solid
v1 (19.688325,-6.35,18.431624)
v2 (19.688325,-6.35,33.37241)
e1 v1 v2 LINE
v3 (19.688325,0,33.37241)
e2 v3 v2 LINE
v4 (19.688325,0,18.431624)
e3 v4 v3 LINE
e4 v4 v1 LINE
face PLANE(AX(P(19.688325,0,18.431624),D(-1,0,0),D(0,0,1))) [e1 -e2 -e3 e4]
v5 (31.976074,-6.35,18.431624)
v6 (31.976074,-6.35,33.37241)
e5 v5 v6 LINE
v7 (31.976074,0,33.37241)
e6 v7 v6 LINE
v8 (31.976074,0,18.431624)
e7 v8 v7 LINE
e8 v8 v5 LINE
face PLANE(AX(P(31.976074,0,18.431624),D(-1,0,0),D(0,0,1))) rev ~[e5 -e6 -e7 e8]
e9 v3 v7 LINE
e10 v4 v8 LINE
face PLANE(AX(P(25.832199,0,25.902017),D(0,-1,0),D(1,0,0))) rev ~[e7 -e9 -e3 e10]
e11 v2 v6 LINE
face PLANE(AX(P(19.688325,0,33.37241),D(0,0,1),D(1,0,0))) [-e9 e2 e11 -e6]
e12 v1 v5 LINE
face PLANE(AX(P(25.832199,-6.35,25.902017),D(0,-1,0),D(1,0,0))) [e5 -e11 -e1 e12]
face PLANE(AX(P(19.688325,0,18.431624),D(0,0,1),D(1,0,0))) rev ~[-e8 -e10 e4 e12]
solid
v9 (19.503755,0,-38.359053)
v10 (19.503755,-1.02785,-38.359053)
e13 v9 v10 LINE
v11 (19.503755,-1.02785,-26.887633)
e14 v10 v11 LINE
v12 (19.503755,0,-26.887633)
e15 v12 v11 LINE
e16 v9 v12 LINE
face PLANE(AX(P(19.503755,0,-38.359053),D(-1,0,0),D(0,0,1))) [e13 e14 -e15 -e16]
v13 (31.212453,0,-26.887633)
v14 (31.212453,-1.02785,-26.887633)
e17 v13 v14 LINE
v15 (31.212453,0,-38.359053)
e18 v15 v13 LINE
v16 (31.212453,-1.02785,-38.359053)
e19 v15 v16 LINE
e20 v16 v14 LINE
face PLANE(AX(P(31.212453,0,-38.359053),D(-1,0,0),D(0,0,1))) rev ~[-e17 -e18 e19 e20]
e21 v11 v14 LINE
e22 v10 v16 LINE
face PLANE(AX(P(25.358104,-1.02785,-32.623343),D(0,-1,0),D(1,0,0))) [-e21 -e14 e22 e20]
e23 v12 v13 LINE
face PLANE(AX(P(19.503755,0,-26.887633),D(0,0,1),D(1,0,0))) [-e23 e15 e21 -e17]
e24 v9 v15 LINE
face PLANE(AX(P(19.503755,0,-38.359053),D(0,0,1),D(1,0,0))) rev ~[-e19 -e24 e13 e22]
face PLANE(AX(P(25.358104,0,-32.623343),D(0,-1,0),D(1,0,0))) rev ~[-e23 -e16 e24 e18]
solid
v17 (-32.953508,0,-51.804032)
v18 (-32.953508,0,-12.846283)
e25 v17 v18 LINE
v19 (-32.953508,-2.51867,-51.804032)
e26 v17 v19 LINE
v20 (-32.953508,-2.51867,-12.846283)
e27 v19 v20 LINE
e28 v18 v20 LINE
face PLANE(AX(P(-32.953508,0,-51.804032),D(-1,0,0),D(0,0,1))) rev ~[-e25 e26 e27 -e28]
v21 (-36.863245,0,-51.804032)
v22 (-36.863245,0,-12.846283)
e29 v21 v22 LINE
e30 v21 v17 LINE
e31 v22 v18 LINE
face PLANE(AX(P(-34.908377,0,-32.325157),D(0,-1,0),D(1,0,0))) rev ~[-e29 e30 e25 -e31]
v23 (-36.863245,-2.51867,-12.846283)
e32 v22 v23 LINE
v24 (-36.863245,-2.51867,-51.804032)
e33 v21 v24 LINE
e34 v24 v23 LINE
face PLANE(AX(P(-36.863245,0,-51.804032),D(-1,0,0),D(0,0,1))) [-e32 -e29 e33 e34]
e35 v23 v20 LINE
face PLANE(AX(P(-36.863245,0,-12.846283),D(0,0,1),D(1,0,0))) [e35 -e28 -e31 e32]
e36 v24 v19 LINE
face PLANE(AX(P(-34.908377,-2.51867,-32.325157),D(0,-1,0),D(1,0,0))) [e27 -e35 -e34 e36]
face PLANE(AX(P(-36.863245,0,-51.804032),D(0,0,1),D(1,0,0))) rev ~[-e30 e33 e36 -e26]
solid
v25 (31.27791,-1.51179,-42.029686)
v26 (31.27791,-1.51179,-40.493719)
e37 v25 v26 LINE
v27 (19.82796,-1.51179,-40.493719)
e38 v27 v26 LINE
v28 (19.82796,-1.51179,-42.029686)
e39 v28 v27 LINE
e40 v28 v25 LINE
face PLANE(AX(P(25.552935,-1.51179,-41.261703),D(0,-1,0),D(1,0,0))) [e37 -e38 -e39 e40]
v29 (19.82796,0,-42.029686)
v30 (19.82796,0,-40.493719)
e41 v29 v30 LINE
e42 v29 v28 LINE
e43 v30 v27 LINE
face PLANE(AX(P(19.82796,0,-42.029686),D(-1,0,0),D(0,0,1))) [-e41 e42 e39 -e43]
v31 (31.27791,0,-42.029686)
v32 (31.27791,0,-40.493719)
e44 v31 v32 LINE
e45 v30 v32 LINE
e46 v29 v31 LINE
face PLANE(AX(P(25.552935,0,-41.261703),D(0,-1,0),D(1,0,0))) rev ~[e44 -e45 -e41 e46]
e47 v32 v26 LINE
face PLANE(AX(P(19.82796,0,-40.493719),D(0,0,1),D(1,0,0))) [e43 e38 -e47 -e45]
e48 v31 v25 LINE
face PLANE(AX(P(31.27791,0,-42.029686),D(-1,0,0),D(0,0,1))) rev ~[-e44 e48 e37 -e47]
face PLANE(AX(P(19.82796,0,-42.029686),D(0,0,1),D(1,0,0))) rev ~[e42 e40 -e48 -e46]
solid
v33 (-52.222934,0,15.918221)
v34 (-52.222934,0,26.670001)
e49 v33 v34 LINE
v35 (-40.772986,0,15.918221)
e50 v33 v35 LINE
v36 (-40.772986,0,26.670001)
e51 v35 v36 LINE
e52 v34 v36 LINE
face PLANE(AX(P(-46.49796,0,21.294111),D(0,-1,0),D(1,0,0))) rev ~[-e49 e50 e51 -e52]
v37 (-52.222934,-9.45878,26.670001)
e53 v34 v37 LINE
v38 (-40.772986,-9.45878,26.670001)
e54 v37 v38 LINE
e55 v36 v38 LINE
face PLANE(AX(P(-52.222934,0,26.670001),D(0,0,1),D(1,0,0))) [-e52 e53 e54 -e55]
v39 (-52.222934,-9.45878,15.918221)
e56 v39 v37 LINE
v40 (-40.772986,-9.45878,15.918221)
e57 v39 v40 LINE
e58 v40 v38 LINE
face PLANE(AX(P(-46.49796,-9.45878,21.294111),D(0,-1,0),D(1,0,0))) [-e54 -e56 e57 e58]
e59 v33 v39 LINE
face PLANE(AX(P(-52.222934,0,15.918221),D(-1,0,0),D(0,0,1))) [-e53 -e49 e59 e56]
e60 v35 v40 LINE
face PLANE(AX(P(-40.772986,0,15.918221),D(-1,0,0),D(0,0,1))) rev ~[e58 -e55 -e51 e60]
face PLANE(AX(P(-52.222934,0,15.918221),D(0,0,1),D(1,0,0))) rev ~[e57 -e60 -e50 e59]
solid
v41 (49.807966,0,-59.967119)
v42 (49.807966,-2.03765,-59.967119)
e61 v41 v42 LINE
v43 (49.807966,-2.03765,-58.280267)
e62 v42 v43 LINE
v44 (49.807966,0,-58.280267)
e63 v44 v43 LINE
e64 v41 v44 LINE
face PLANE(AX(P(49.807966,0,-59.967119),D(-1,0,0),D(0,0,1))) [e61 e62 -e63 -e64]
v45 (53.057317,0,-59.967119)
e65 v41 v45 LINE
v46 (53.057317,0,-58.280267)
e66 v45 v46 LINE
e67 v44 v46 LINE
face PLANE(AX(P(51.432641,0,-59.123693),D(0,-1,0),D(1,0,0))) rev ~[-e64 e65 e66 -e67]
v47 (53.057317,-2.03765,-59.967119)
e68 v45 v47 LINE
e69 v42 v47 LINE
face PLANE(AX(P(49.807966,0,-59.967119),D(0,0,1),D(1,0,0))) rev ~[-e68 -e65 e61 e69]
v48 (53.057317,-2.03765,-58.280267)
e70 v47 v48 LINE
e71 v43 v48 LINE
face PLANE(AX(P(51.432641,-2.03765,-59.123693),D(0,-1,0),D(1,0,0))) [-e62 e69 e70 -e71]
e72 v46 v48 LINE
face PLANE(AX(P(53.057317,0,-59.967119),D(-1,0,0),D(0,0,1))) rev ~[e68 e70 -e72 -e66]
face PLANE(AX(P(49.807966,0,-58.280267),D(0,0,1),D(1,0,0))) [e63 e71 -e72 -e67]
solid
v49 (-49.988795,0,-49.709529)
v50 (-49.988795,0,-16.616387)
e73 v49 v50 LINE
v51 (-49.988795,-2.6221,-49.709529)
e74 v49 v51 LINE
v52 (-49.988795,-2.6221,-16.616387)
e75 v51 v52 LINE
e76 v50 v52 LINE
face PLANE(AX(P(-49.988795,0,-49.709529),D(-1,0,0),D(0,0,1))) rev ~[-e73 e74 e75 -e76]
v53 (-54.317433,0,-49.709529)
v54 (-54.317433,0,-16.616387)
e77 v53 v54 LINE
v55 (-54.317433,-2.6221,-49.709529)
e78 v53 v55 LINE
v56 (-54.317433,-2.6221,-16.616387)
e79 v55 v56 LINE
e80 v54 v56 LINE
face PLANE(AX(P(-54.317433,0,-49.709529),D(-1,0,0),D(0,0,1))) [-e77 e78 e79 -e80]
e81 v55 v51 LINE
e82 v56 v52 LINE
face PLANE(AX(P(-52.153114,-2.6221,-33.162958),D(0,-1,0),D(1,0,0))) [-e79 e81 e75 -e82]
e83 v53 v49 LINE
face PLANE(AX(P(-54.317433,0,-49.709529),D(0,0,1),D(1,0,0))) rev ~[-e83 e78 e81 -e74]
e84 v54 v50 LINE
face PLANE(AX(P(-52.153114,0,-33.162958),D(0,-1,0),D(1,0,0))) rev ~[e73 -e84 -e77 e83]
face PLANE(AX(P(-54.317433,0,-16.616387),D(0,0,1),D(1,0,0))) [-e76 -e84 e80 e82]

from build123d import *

# Parameters (mm, degrees)
F0_W      = 4.3286383152
F0_H      = 33.0931413919
F1_DEPTH  = 2.6221
F2_W      = 3.9097368717
F2_H      = 38.9577494934
F3_DEPTH  = 2.51867
F4_W      = 12.2877489775
F4_H      = 14.9407852441
F5_DEPTH  = 6.35
F6_W      = 11.4499479532
F6_H      = 10.7517801225
F7_DEPTH  = 9.45878
F8_W      = 11.7086973041
F8_H      = 11.4714205265
F9_DEPTH  = 1.02785
F12_W     = 11.4499498159
F12_H     = 1.5359669924
F13_DEPTH = 1.51179
F14_W     = 3.2493509352
F14_H     = 1.6868524253
F15_DEPTH = 2.03765


# Not quite as in the source:
# - the program builds the solid bodies; features that only make, move or delete a surface that nothing else refers to are left out


with BuildPart() as f1:
    # F0 (on Front) → F1 (new body)
    with BuildSketch(Plane.XZ):
        with Locations((-52.1531142294, -33.1629579887)):
            Rectangle(F0_W, F0_H)
    extrude(amount=F1_DEPTH)


with BuildPart() as f3:
    # F2 (on Front) → F3 (new body)
    with BuildSketch(Plane.XZ):
        with Locations((-34.9083766341, -32.32515743)):
            Rectangle(F2_W, F2_H)
    extrude(amount=F3_DEPTH)


with BuildPart() as f5:
    # F4 (on Front) → F5 (new body)
    with BuildSketch(Plane.XZ):
        with Locations((25.8321994916, 25.9020170197)):
            Rectangle(F4_W, F4_H)
    extrude(amount=F5_DEPTH)


with BuildPart() as f7:
    # F6 (on Front) → F7 (new body)
    with BuildSketch(Plane.XZ):
        with Locations((-46.4979596436, 21.2941113859)):
            Rectangle(F6_W, F6_H)
    extrude(amount=F7_DEPTH)


with BuildPart() as f9:
    # F8 (on Front) → F9 (new body)
    with BuildSketch(Plane.XZ):
        with Locations((25.358104147, -32.6233431697)):
            Rectangle(F8_W, F8_H)
    extrude(amount=F9_DEPTH)


with BuildPart() as f13:
    # F12 (on Front) → F13 (new body)
    with BuildSketch(Plane.XZ):
        with Locations((25.552934967, -41.261702776)):
            Rectangle(F12_W, F12_H)
    extrude(amount=F13_DEPTH)


with BuildPart() as f15:
    # F14 (on Front) → F15 (new body)
    with BuildSketch(Plane.XZ):
        with Locations((51.4326412231, -59.1236930341)):
            Rectangle(F14_W, F14_H)
    extrude(amount=F15_DEPTH)


solid = Compound([f1.part, f3.part, f5.part, f7.part, f9.part, f13.part, f15.part])
